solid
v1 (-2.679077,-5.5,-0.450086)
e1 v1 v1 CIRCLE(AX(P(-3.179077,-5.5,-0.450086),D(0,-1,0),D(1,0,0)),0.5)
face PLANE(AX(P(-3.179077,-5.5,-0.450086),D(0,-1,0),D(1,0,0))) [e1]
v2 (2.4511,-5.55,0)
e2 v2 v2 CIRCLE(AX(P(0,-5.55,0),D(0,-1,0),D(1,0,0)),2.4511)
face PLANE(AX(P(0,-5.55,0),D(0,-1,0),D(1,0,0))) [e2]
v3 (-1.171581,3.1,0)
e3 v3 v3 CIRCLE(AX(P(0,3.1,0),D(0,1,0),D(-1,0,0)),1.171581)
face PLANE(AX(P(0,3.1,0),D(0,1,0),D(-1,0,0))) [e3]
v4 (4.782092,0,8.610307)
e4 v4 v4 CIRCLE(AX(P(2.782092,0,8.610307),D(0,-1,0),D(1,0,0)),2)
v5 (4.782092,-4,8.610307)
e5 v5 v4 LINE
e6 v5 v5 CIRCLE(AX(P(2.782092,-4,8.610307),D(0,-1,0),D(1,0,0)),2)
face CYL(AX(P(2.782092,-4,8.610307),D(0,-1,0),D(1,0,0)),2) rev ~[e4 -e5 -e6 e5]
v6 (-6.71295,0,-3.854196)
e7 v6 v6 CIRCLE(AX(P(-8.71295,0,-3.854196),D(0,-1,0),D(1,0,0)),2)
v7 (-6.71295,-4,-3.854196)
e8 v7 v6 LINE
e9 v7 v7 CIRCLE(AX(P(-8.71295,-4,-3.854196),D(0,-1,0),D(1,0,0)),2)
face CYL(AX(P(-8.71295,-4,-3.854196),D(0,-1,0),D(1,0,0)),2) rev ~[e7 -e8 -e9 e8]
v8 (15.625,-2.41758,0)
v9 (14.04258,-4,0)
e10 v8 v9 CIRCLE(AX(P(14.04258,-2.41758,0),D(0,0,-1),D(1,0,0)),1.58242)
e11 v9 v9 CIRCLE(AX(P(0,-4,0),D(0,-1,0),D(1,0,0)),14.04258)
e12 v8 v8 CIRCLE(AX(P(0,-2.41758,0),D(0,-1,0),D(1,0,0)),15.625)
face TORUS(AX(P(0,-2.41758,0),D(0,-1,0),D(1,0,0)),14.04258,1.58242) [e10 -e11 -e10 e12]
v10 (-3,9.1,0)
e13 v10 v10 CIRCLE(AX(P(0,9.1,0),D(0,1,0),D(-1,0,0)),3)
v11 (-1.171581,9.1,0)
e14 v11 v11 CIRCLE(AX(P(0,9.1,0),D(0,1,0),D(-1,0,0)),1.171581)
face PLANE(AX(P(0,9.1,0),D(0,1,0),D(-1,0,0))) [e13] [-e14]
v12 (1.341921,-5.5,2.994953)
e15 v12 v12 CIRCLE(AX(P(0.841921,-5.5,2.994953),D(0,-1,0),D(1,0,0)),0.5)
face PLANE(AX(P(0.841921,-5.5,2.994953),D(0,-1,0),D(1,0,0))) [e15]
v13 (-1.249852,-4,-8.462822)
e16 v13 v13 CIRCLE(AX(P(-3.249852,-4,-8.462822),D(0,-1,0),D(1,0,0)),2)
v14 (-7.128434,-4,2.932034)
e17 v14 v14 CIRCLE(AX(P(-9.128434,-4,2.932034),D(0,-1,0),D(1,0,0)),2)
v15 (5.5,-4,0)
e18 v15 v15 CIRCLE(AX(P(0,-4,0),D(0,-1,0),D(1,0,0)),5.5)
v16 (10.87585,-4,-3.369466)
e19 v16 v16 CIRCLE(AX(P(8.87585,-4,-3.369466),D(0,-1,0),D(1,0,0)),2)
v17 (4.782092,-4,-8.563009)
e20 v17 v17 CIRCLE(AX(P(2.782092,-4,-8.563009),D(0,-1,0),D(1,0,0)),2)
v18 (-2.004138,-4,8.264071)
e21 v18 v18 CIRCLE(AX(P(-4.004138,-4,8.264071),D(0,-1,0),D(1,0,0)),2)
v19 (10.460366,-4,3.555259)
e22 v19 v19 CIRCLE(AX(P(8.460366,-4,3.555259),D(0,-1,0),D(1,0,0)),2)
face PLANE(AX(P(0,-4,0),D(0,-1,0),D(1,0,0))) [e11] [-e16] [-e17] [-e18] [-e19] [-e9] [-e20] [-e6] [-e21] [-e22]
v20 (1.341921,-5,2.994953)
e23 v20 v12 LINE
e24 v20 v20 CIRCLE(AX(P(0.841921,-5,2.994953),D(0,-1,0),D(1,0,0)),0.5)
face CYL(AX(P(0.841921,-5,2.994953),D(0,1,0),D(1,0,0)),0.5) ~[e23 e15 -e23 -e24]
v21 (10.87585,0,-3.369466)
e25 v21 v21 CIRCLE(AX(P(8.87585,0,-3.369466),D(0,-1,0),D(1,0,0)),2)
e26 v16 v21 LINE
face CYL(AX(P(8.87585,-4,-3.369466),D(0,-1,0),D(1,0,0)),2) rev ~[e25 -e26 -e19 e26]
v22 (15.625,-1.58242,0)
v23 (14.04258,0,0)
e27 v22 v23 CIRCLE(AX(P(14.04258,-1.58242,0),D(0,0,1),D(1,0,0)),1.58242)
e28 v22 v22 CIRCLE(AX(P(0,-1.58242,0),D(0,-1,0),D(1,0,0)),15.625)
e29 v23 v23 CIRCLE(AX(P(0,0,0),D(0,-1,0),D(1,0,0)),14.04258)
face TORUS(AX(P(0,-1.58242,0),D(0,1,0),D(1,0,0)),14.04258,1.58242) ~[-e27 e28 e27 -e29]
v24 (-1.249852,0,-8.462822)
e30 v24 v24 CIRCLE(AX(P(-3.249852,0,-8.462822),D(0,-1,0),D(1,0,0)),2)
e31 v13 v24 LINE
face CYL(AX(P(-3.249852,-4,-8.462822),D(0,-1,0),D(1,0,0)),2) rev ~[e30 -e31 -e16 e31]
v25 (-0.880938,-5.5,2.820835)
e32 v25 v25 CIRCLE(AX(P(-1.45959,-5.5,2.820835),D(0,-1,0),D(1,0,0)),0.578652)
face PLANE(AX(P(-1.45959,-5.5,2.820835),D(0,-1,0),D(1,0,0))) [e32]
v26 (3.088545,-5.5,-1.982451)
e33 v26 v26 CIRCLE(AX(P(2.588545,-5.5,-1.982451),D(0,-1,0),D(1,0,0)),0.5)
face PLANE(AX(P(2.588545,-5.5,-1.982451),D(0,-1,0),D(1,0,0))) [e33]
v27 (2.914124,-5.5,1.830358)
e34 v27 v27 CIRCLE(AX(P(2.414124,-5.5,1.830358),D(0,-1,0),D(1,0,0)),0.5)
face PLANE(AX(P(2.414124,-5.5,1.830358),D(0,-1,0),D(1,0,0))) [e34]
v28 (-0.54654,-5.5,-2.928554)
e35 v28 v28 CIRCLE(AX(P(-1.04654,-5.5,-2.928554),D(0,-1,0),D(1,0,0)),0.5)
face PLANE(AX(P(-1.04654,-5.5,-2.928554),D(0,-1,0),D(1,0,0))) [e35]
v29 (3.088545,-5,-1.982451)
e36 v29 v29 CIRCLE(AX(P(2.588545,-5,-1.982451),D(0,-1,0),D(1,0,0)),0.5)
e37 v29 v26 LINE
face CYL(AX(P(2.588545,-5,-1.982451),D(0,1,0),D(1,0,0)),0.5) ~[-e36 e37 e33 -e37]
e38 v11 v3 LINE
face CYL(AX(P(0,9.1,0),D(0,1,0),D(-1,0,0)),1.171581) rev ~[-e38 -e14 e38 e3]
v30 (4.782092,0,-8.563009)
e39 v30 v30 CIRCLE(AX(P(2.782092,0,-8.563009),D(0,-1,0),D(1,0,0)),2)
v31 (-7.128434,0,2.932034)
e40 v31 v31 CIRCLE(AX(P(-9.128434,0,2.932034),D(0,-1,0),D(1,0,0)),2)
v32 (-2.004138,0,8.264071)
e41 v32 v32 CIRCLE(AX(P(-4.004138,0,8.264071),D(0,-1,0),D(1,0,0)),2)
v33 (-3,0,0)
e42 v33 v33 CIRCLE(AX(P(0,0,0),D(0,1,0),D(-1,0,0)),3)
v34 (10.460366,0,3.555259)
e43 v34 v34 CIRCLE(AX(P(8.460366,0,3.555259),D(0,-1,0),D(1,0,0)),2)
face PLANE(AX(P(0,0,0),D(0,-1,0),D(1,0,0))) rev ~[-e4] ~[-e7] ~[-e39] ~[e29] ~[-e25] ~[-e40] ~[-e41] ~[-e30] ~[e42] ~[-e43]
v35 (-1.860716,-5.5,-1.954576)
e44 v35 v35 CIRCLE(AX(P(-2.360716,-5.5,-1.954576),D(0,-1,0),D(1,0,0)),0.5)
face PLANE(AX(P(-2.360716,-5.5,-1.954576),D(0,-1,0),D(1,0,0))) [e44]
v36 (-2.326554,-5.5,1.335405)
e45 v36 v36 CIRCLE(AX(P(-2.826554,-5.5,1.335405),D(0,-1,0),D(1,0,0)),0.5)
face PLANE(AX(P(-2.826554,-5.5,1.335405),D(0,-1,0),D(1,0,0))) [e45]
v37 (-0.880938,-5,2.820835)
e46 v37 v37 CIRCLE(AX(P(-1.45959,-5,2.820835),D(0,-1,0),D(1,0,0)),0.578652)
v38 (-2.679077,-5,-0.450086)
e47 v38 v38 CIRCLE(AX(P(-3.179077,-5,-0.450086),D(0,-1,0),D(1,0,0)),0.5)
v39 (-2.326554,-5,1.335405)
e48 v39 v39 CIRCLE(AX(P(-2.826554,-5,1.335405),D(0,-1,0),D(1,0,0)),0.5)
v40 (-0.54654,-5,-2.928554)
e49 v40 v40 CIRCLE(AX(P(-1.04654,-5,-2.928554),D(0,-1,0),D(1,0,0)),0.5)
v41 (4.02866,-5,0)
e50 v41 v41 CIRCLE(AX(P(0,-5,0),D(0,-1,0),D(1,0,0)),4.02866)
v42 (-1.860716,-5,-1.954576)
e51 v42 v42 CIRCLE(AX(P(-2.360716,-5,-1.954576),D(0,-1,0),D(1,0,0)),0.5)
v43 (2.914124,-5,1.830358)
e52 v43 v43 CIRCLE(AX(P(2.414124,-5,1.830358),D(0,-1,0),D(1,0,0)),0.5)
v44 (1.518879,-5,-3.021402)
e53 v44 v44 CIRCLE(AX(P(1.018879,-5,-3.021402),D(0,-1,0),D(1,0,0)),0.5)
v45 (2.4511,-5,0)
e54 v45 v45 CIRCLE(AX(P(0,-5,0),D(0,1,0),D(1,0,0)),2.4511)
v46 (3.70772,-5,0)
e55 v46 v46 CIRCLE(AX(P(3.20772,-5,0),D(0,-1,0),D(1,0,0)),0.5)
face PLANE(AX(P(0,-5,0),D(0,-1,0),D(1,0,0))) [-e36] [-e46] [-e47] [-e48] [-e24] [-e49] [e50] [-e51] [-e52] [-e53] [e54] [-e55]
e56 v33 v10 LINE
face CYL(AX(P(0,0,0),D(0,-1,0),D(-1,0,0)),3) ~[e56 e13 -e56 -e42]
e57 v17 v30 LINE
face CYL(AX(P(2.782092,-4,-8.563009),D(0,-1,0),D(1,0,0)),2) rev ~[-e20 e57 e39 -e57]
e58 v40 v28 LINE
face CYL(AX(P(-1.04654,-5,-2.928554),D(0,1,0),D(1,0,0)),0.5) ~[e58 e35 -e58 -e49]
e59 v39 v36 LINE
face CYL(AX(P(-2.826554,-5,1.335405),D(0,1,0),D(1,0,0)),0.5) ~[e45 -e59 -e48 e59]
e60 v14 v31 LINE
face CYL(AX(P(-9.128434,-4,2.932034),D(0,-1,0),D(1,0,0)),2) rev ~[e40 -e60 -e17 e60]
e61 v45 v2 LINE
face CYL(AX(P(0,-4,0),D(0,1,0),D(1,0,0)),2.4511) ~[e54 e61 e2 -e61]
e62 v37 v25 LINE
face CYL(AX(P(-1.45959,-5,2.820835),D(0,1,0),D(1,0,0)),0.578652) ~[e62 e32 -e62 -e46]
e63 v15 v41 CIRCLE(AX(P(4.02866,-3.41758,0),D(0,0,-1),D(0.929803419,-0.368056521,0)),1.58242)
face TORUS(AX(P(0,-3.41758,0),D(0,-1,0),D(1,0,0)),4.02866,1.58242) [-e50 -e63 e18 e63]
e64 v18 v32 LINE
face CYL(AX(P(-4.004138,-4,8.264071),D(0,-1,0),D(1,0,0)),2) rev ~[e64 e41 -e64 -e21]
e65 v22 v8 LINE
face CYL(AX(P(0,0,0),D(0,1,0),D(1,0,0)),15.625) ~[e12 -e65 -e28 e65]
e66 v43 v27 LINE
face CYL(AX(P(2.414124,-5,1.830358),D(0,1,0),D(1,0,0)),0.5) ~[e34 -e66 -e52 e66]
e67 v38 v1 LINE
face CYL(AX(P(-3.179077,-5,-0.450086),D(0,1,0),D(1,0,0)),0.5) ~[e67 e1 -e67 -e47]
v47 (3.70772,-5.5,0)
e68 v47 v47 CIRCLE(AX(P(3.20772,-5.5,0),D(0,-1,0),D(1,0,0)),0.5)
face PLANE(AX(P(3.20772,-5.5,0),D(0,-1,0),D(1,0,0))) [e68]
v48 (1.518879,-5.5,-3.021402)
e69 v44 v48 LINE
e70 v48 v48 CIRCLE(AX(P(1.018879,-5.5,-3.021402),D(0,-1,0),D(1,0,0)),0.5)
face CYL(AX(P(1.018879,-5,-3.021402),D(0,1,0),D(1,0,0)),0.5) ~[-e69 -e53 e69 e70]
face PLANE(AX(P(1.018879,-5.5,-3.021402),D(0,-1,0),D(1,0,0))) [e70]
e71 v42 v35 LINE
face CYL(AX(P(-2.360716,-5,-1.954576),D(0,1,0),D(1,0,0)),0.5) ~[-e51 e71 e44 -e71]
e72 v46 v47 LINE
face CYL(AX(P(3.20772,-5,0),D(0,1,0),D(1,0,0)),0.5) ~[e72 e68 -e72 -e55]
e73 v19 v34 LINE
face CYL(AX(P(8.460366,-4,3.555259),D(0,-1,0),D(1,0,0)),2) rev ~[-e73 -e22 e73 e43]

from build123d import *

# Parameters (mm, degrees)
F0_R      = 15.625
F1_DEPTH  = 4
F2_R      = 2.4511
F3_DEPTH  = 1.55
F4_R      = 3
F5_DEPTH  = 9.1
F6_R      = 1.171580863
F7_DEPTH  = 6
F8_R      = 5.5
F9_DEPTH  = 1
F11_R     = 0.5
F11_R_2   = 0.5786516817
F12_DEPTH = 0.5
F13_R     = 2
F14_DEPTH = 25.4


# Not quite as in the source:
# - a fillet or chamfer that OpenCascade refuses, or shapes differently, is made with other operations: its cross-section is extruded or revolved along the edge and cut away or added


with BuildPart() as f1:
    # F0 (on Front) → F1 (new body)
    with BuildSketch(Plane.XZ):
        Circle(F0_R)
    extrude(amount=F1_DEPTH)

    # F2 (on face) → F3 (join)
    with BuildSketch(Plane.XZ.offset(4)):
        Circle(F2_R)
    extrude(amount=F3_DEPTH)

    # F4 (on face) → F5 (join)
    with BuildSketch(Plane(origin=(0, 0, 0), x_dir=(-1, 0, 0), z_dir=(0, 1, 0))):
        Circle(F4_R)
    extrude(amount=F5_DEPTH)

    # F6 (on face) → F7 (cut)
    with BuildSketch(Plane(origin=(0, 9.1, 0), x_dir=(-1, 0, 0), z_dir=(0, 1, 0))):
        Circle(F6_R)
    extrude(amount=-F7_DEPTH, mode=Mode.SUBTRACT)

    # F8 (on face) → F9 (join)
    with BuildSketch(Plane.XZ.offset(4)):
        Circle(F8_R)
    extrude(amount=F9_DEPTH)

    # F10: fillet of radius 1.58242 on 3 edges, made by hand

    # F10_s1 → F10_t2 (revolve, cut)
    with BuildSketch(Plane.XY):
        with BuildLine():
            ThreePointArc((15.625, -2.41758), (15.1615199127, -3.5365199127), (14.04258, -4))
            Line((14.04258, -4), (15.625, -4))
            Line((15.625, -4), (15.625, -2.41758))
        make_face()
    revolve(axis=Axis((0, -4, 0), (0, -1, 0)), mode=Mode.SUBTRACT)

    # F10_s3 → F10_t4 (revolve, cut)
    with BuildSketch(Plane.XY):
        with BuildLine():
            ThreePointArc((15.625, -1.58242), (15.1615199127, -0.4634800873), (14.04258, 0))
            Line((14.04258, 0), (15.625, 0))
            Line((15.625, 0), (15.625, -1.58242))
        make_face()
    revolve(axis=Axis((0, 0, 0), (0, -1, 0)), mode=Mode.SUBTRACT)

    # F10_s5 → F10_t6 (revolve, cut)
    with BuildSketch(Plane.XY):
        with BuildLine():
            ThreePointArc((5.5, -4), (4.9181603337, -4.7263363014), (4.0286604743, -5))
            Line((4.0286604743, -5), (5.5, -5))
            Line((5.5, -5), (5.5, -4))
        make_face()
    revolve(axis=Axis((0, -5, 0), (0, -1, 0)), mode=Mode.SUBTRACT)

    # F11 (on face) → F12 (join)
    with BuildSketch(Plane.XZ.offset(5)):
        with Locations((-2.8265540022, 1.3354053954)):
            Circle(F11_R)
        with Locations((-1.4595896937, 2.8208354488)):
            Circle(F11_R_2)
        with Locations((2.4141243193, 1.8303584075)):
            Circle(F11_R)
        with Locations((3.2077198848, 0)):
            Circle(F11_R)
        with Locations((2.5885446352, -1.9824508684)):
            Circle(F11_R)
        with Locations((1.0188785489, -3.0214018971)):
            Circle(F11_R)
        with Locations((-1.0465403436, -2.928553993)):
            Circle(F11_R)
        with Locations((-3.1790773666, -0.4500864609)):
            Circle(F11_R)
        with Locations((0.8419207879, 2.9949534219)):
            Circle(F11_R)
        with Locations((-2.3607159965, -1.9545760006)):
            Circle(F11_R)
    extrude(amount=F12_DEPTH)

    # F13 (on face) → F14 (cut)
    with BuildSketch(Plane.XZ.offset(4)):
        with Locations((-4.0041380562, 8.2640713081)):
            Circle(F13_R)
        with Locations((2.7820917312, 8.610307239)):
            Circle(F13_R)
        with Locations((-9.1284336522, 2.9320335016)):
            Circle(F13_R)
        with Locations((8.4603661671, 3.555258736)):
            Circle(F13_R)
        with Locations((8.8758496568, -3.3694657031)):
            Circle(F13_R)
        with Locations((2.7820917312, -8.5630090907)):
            Circle(F13_R)
        with Locations((-3.2498515921, -8.4628218188)):
            Circle(F13_R)
        with Locations((-8.7129501626, -3.8541962858)):
            Circle(F13_R)
    extrude(amount=-F14_DEPTH, mode=Mode.SUBTRACT)


solid = f1.part
